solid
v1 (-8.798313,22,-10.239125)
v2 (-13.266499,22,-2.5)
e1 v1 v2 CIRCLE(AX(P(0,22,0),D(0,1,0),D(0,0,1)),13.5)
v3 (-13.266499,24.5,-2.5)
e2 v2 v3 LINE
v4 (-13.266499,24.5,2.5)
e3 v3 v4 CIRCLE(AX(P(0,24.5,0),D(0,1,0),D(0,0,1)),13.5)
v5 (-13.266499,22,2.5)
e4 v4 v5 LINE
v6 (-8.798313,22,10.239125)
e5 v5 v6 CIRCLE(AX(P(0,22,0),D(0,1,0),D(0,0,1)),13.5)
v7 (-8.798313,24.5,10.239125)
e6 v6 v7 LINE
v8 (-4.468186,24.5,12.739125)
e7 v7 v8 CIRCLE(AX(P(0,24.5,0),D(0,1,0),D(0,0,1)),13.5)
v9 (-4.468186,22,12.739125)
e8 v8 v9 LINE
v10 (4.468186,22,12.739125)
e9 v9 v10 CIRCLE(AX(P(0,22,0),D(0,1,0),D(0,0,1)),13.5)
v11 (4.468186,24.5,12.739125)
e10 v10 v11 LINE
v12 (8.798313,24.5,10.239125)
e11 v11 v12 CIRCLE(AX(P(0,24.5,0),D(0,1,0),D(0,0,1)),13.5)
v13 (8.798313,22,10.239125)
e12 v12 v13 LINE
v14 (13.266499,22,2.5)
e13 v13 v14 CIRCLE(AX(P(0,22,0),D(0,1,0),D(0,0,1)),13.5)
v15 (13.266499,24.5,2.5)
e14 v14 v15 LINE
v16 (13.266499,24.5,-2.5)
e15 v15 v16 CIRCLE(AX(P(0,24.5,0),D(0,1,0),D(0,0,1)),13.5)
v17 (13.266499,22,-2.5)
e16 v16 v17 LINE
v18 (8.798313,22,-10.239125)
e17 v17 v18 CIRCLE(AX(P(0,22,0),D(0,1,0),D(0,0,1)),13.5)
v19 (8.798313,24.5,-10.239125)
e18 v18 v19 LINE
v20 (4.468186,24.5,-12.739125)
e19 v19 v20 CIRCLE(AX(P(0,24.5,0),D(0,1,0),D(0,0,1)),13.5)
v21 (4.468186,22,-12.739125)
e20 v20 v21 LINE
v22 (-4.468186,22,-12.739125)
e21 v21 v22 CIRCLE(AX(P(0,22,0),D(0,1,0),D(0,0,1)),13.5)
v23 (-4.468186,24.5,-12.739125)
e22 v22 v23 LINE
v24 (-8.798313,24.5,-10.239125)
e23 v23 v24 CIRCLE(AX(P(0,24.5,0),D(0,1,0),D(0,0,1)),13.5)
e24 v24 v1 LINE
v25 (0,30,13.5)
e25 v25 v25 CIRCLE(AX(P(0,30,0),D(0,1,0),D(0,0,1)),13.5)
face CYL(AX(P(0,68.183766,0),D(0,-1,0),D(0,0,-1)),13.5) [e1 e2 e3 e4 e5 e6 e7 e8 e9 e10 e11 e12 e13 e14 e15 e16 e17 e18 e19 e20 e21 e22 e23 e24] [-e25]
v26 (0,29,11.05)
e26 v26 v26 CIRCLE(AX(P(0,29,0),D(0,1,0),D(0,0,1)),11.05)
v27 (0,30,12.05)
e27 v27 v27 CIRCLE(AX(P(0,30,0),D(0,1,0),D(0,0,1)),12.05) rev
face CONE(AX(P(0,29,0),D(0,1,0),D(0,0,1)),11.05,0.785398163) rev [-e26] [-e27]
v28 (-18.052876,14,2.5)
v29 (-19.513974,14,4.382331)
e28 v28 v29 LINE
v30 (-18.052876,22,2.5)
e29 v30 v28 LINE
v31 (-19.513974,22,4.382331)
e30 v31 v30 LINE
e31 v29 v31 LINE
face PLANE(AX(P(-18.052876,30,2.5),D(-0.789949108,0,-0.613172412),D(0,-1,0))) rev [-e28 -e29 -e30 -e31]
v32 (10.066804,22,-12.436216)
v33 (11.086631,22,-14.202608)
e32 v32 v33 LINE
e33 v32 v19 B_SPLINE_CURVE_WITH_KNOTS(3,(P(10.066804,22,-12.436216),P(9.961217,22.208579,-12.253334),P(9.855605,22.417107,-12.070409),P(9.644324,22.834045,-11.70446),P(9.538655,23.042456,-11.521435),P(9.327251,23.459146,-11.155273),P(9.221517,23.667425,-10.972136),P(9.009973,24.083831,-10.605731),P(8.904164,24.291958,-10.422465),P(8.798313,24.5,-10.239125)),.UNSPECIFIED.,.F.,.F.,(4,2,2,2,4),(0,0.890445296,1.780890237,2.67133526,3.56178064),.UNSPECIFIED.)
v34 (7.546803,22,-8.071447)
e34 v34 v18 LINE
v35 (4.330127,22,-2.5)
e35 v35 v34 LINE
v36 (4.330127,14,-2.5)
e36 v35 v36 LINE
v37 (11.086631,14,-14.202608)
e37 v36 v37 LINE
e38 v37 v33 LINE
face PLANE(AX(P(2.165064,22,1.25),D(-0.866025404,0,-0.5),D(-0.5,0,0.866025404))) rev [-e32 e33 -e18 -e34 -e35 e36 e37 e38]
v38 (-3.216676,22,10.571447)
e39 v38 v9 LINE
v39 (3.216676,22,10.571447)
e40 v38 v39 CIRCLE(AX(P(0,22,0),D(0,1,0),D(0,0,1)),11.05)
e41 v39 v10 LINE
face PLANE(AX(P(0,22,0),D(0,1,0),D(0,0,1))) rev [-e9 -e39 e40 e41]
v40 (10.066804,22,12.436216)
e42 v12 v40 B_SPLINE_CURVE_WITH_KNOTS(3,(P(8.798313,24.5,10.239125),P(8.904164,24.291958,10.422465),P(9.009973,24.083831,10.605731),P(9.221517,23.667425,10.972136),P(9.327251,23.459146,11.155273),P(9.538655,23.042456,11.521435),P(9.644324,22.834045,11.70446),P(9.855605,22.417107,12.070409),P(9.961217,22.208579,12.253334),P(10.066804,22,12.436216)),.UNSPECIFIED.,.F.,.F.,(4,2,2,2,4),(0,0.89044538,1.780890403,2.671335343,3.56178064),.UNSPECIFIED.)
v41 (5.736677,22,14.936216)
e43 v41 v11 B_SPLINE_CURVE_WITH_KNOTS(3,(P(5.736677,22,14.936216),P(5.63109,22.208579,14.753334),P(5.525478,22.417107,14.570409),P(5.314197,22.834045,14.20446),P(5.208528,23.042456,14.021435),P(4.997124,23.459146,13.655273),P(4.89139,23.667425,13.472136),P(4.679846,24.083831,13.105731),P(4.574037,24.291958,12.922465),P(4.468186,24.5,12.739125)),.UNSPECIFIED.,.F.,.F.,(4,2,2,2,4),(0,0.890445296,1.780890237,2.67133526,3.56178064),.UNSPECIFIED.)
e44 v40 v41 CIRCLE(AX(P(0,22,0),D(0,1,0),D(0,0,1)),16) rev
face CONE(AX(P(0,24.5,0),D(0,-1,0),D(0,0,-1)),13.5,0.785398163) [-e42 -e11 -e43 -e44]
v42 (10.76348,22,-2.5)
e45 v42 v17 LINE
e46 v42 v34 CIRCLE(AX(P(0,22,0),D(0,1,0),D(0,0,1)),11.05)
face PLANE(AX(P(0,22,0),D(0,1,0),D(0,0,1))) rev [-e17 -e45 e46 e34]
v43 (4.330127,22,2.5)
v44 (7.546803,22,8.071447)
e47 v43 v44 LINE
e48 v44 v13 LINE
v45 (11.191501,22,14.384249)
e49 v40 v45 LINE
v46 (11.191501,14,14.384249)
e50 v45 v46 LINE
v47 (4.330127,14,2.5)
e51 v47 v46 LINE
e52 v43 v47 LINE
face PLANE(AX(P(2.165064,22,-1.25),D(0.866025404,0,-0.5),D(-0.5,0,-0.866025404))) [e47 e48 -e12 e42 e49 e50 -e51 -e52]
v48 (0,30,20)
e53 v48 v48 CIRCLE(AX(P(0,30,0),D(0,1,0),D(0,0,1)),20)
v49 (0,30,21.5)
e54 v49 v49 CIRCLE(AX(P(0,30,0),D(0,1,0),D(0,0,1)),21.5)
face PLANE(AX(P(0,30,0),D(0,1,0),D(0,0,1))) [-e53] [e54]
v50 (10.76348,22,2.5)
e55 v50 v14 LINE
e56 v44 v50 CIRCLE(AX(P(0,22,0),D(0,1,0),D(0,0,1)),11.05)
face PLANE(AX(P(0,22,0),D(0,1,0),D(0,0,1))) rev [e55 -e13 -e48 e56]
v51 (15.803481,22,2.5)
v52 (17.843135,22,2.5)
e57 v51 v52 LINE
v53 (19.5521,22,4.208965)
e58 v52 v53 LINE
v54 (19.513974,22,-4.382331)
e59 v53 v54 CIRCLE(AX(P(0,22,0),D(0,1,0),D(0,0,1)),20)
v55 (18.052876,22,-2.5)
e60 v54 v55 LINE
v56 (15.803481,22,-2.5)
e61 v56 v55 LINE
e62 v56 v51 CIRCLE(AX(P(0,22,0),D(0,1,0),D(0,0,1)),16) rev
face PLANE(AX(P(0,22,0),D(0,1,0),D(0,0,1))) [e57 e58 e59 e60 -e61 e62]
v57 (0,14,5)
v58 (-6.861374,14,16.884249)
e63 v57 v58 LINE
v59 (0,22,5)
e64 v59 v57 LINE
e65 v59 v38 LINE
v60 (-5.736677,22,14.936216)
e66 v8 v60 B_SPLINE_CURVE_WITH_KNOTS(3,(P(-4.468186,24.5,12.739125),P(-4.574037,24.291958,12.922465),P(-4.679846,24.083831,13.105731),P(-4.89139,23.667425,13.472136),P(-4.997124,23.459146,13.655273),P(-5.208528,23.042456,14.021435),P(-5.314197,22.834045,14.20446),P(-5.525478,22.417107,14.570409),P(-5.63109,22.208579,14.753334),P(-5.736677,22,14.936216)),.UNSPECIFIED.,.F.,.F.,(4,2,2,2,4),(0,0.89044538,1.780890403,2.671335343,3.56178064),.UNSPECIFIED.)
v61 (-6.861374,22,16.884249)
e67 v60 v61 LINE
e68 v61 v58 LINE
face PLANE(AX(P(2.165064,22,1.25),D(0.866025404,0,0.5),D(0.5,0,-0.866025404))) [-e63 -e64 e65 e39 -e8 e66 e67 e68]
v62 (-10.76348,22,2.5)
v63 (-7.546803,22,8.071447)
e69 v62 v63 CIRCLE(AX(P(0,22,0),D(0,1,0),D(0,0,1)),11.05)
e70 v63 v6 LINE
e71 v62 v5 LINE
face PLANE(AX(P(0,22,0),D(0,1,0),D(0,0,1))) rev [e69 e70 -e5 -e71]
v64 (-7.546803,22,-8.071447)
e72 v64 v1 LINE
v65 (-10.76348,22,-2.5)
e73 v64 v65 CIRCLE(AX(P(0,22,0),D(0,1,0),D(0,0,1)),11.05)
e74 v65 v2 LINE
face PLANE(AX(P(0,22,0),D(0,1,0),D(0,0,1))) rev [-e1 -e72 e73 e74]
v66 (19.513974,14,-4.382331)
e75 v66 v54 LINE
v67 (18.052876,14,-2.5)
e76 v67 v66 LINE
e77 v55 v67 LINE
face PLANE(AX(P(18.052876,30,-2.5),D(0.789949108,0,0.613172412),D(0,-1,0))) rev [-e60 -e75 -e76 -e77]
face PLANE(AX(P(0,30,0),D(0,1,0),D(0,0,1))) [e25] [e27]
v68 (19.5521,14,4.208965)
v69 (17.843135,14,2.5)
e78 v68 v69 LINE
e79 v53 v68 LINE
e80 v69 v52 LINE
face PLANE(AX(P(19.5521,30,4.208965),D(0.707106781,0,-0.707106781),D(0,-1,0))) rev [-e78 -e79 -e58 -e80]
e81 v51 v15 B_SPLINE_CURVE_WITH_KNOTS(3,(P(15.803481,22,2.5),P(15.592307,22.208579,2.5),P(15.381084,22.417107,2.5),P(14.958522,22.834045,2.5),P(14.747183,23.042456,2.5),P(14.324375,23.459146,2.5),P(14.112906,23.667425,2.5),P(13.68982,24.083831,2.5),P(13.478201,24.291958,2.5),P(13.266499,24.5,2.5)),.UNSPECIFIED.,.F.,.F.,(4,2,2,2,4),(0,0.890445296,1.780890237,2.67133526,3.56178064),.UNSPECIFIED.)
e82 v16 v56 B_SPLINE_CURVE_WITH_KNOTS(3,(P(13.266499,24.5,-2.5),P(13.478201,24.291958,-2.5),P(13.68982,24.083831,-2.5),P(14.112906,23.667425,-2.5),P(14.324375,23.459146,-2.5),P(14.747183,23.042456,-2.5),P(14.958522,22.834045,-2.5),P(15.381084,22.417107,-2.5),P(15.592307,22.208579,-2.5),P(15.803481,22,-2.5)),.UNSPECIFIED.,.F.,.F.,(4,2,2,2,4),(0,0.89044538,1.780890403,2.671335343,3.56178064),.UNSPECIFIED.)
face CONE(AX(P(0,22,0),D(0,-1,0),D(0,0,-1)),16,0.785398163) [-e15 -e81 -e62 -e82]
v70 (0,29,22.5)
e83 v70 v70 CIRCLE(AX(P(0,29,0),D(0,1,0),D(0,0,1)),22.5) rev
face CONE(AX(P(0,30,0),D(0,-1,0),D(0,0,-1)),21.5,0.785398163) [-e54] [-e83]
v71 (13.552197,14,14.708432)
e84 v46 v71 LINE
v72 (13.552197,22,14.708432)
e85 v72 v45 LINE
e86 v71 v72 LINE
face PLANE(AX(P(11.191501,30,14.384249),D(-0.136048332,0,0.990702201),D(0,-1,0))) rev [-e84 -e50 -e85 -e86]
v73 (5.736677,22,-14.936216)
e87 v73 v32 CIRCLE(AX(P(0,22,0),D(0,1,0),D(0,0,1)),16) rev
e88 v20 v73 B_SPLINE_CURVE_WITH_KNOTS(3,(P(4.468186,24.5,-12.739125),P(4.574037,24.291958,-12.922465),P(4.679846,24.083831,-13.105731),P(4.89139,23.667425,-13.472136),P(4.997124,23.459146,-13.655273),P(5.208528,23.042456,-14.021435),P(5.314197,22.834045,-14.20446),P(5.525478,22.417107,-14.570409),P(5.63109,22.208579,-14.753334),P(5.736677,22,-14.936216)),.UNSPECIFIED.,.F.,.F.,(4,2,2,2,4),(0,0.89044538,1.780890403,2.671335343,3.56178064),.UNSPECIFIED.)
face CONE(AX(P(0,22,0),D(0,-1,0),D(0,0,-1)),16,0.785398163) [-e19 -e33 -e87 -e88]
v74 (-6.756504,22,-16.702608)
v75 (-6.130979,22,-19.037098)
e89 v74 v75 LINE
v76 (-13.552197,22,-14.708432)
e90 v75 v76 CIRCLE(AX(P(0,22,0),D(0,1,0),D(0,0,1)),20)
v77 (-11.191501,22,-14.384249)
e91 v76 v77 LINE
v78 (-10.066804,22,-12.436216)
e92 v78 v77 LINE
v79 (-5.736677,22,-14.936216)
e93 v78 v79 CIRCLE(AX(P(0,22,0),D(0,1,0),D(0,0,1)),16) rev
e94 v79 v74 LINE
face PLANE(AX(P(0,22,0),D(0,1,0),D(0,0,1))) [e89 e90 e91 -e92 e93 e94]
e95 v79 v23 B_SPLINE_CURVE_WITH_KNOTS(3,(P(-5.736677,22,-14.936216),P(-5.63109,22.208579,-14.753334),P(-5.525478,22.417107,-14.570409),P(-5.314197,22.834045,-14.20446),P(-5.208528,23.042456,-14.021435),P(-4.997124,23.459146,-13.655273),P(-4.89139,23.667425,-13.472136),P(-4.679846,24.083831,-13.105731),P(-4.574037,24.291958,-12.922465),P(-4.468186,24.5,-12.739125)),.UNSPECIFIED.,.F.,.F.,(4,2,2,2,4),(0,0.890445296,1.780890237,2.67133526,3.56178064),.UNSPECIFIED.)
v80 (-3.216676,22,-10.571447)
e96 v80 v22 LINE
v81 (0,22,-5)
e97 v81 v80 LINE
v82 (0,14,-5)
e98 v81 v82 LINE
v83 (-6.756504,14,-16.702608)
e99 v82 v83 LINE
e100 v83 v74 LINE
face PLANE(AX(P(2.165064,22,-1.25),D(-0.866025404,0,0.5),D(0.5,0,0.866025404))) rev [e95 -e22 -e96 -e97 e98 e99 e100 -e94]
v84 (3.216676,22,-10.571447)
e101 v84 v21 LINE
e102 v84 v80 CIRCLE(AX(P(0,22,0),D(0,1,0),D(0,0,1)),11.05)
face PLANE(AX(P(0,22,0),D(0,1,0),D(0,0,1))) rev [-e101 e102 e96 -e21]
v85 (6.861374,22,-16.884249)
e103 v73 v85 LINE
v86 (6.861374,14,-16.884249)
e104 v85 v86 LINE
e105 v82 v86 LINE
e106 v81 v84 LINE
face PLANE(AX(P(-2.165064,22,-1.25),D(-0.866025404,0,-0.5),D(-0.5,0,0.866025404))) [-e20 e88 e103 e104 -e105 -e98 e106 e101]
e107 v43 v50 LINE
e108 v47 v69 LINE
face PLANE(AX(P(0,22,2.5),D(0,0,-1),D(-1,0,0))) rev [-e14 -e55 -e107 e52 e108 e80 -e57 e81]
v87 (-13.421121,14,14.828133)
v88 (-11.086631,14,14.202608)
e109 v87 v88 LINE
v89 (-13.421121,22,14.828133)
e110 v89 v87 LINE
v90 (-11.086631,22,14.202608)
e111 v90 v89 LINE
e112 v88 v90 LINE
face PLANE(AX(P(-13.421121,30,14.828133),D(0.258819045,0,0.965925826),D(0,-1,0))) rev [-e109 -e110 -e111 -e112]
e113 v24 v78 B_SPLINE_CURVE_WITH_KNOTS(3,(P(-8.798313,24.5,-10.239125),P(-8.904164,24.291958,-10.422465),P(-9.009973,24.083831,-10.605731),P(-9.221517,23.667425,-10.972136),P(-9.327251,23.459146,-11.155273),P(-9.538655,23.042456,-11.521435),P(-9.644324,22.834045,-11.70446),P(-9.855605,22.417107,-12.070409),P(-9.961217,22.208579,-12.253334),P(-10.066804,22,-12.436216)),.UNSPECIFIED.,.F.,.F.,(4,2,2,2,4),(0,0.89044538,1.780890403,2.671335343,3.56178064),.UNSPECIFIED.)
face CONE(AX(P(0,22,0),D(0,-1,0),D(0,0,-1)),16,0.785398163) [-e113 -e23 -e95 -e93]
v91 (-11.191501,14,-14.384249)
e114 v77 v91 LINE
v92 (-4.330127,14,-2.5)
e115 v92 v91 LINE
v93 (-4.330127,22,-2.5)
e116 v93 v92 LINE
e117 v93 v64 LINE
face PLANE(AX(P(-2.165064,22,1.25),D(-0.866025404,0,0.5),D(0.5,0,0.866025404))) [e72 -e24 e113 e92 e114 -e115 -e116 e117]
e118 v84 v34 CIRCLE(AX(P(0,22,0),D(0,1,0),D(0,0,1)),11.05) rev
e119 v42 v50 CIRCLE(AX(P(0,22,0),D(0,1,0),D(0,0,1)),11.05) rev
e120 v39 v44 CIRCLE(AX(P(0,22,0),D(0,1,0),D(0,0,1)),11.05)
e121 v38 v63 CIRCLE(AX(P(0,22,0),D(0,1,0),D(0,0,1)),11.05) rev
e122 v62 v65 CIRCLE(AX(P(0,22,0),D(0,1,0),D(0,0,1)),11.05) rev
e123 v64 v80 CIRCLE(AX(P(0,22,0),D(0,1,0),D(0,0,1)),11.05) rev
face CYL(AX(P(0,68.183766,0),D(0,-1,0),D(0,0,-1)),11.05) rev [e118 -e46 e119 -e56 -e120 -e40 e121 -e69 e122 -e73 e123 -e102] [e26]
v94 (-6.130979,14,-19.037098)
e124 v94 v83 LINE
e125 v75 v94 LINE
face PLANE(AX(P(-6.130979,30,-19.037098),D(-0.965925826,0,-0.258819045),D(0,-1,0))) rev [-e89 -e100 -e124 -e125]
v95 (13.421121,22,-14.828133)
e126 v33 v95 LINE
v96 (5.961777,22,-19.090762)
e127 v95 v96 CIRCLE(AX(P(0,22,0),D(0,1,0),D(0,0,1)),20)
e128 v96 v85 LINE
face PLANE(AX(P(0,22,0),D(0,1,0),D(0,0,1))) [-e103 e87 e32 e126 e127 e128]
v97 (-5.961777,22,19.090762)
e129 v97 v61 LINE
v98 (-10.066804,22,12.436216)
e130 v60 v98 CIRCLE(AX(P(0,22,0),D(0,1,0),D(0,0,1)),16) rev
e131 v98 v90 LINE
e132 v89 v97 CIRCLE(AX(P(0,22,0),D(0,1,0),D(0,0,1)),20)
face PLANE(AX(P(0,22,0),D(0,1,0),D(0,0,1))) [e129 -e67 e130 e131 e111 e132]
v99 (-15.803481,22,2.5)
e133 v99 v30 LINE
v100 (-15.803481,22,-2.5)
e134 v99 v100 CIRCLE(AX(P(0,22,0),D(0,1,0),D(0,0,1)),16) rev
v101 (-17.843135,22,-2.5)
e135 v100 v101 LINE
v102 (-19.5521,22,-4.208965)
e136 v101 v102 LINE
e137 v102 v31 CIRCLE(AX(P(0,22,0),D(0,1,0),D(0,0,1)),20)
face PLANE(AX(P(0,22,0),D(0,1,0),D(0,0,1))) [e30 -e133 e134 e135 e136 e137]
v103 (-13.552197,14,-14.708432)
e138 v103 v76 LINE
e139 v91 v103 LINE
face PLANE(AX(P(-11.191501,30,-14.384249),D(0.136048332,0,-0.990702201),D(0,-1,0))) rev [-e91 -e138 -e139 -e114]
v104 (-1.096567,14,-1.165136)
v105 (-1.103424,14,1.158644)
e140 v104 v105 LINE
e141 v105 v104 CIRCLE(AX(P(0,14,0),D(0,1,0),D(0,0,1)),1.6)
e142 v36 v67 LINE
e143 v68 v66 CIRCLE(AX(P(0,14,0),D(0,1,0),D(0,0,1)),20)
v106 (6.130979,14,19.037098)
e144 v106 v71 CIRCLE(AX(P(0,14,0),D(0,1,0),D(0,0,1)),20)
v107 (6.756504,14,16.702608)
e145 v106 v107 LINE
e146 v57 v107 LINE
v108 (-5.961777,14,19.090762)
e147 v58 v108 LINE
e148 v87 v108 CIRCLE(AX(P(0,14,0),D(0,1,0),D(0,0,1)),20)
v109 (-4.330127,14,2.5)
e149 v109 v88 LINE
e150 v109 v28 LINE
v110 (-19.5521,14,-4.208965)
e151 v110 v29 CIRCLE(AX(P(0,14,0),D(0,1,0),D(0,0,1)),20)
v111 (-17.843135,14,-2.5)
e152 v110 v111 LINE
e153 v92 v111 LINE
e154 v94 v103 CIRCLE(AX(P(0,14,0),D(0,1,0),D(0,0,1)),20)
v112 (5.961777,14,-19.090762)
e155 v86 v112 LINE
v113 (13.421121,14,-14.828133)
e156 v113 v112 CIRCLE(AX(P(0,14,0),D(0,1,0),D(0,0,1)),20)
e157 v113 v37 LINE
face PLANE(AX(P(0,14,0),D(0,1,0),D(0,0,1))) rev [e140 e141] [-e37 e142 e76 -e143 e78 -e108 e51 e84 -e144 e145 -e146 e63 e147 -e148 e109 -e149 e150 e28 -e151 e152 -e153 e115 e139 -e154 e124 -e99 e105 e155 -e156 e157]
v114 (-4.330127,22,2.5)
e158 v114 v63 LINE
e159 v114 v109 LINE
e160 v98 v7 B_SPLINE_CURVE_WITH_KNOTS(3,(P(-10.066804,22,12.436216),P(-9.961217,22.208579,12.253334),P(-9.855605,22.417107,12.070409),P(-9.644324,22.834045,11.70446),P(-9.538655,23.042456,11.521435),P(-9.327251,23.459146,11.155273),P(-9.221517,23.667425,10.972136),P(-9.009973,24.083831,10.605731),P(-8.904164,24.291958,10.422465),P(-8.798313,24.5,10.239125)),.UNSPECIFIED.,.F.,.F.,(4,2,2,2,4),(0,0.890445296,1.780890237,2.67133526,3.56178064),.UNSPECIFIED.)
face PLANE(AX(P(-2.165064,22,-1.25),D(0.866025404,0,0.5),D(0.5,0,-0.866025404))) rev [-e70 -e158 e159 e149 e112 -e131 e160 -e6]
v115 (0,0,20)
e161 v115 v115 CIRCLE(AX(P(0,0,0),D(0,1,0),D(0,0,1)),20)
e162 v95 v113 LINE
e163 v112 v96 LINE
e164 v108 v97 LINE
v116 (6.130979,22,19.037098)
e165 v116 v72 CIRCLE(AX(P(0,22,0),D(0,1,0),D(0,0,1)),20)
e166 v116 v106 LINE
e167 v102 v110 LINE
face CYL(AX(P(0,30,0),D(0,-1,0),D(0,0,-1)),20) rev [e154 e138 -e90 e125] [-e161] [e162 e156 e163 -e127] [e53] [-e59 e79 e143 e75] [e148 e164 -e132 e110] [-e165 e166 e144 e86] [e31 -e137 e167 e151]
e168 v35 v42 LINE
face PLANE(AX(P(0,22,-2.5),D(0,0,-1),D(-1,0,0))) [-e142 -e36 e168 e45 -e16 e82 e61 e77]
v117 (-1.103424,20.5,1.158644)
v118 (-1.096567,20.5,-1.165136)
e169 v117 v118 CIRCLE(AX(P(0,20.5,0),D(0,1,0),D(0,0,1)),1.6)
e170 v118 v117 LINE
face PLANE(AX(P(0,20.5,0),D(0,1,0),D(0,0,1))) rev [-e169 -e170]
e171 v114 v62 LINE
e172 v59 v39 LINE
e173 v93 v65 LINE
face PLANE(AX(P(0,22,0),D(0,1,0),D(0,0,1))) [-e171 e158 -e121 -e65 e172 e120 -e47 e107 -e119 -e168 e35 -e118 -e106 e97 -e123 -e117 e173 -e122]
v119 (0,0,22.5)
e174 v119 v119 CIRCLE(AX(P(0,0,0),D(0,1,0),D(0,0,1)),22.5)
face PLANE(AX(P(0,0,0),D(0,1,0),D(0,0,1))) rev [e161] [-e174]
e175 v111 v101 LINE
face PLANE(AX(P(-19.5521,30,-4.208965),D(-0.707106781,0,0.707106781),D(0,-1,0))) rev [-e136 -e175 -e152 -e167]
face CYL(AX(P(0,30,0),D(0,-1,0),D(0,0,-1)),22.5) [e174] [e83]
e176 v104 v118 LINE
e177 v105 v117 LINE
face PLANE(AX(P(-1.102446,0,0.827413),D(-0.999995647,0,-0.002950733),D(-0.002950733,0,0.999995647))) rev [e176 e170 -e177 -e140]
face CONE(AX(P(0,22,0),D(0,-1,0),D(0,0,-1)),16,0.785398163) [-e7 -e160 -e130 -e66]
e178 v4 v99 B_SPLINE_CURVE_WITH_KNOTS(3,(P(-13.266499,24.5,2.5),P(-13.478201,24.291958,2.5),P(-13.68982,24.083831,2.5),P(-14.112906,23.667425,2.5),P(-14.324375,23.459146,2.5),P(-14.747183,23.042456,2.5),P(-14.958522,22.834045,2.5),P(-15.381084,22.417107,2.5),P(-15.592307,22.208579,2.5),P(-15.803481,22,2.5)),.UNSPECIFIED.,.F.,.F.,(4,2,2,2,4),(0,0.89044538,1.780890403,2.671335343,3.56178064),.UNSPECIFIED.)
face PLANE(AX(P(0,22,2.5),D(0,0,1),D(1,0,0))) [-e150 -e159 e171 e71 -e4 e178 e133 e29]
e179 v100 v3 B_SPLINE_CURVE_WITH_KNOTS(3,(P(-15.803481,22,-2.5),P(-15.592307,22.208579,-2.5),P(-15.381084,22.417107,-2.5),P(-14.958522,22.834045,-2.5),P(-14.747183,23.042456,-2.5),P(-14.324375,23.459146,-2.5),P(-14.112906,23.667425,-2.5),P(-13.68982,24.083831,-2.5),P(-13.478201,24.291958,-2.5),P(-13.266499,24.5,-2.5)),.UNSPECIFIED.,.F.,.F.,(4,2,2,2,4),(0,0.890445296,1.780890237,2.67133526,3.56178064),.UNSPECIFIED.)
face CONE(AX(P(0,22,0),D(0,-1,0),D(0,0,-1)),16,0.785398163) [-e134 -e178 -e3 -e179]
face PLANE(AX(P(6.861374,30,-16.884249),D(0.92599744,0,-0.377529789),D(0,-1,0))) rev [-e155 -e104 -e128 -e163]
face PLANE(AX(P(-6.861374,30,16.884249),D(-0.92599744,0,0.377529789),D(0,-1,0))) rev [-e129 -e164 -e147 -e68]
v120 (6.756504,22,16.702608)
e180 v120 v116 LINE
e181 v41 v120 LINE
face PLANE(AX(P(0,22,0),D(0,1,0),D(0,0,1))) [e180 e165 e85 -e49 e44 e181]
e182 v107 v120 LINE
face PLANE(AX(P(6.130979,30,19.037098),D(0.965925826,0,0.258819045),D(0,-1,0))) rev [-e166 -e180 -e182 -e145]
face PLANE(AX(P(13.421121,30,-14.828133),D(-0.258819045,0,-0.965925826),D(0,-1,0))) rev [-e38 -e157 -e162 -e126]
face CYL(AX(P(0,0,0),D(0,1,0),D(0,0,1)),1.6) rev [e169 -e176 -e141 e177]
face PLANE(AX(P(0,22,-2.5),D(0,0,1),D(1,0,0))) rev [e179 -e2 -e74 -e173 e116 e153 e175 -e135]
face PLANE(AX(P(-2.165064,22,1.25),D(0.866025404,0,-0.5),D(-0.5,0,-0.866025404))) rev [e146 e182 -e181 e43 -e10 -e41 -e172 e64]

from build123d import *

# Parameters (mm, degrees)
SKETCH1_R               = 22.5
SKETCH1_R_2             = 20
BOSS_EXTRUDE1_DEPTH     = 30
BOSS_EXTRUDE2_DEPTH     = 4
CHAMFER1_SIZE           = 2
CHAMFER1_SIZE_2         = 1.79025908
CUT_EXTRUDE1_DEPTH      = 39.684622268
CUT_EXTRUDE1_DEPTH_BACK = 39.684622268
BOSS_EXTRUDE3_START     = -1.5
BOSS_EXTRUDE3_DEPTH     = 1.5
SKETCH6_R               = 13.5
SKETCH6_R_2             = 11.05
BOSS_EXTRUDE4_DEPTH     = 8
CHAMFER2_SIZE           = 1
CHAMFER3_SIZE           = 1
CHAMFER4_SIZE           = 2.5


with BuildPart() as part:
    # Sketch1 → Boss-Extrude1 (new body)
    with BuildSketch(Plane(origin=(0, 0, 0), x_dir=(1, 0, 0), z_dir=(0, 1, 0))):
        with Locations(Location((0, 0, 0), (0, 0, 270))):
            Circle(SKETCH1_R)
        with Locations(Location((0, 0, 0), (0, 0, 270))):
            Circle(SKETCH1_R_2, mode=Mode.SUBTRACT)
    extrude(amount=BOSS_EXTRUDE1_DEPTH)

    # Sketch2 → Boss-Extrude2 (add, symmetric)
    with BuildSketch(Plane(origin=(0, 18, 0), x_dir=(1, 0, 0), z_dir=(0, 1, 0))):
        with BuildLine():
            Line((-12.086630926, 15.934658856), (-4.330127019, 2.5))
            Line((-4.330127019, 2.5), (-19.843134833, 2.5))
            ThreePointArc((-19.843134833, 2.5), (-20, 0), (-19.843134833, -2.5))
            Line((-19.843134833, -2.5), (-4.330127019, -2.5))
            Line((-4.330127019, -2.5), (-12.086630926, -15.934658856))
            ThreePointArc((-12.086630926, -15.934658856), (-10, -17.320508076), (-7.756503907, -18.434658856))
            Line((-7.756503907, -18.434658856), (0, -5))
            Line((0, -5), (7.756503907, -18.434658856))
            ThreePointArc((7.756503907, -18.434658856), (10, -17.320508076), (12.086630926, -15.934658856))
            Line((12.086630926, -15.934658856), (4.330127019, -2.5))
            Line((4.330127019, -2.5), (19.843134833, -2.5))
            ThreePointArc((19.843134833, -2.5), (19.960745185, -1.252458251), (20, 0))
            ThreePointArc((20, 0), (19.960745185, 1.252458251), (19.843134833, 2.5))
            Line((19.843134833, 2.5), (4.330127019, 2.5))
            Line((4.330127019, 2.5), (12.086630926, 15.934658856))
            ThreePointArc((12.086630926, 15.934658856), (10, 17.320508076), (7.756503907, 18.434658856))
            Line((7.756503907, 18.434658856), (0, 5))
            Line((0, 5), (-7.756503907, 18.434658856))
            ThreePointArc((-7.756503907, 18.434658856), (-10, 17.320508076), (-12.086630926, 15.934658856))
        make_face()
    extrude(amount=BOSS_EXTRUDE2_DEPTH, both=True)

    # Chamfer1
    # the kernel refuses this chamfer: 2, 1.79025908 mm, written as the material it adds along each edge
    with BuildSketch(Plane(origin=(7.756503907, 22, 18.434658856), x_dir=(-0.9376749432180777, 0, 0.34751359809505994), z_dir=(0, -1, 0)), Plane(origin=(19.843134833, 22, 2.5), x_dir=(-0.16788186749818226, 0, 0.9858071203665161), z_dir=(0, -1, 0)), Plane(origin=(12.086630926, 22, -15.934658856), x_dir=(0.7697930757198956, 0, 0.6382935222714571), z_dir=(0, -1, 0)), Plane(origin=(-7.756503907, 22, -18.434658856), x_dir=(0.9376749432180783, 0, -0.34751359809505833), z_dir=(0, -1, 0)), Plane(origin=(-19.843134833, 22, -2.5), x_dir=(0.1678818674981782, 0, -0.9858071203665167), z_dir=(0, -1, 0)), Plane(origin=(-12.086630926, 22, 15.934658856), x_dir=(-0.7697930757198955, 0, -0.6382935222714572), z_dir=(0, -1, 0))) as chamfer1_piece_1:
        with BuildLine():
            Line((1.733569464, 0), (CHAMFER1_SIZE * 0.167881867498, CHAMFER1_SIZE * 0.985807120367))
            Line((CHAMFER1_SIZE * 0.167881867498, CHAMFER1_SIZE * 0.985807120367), (0, 0))
            ThreePointArc((0, 0), (0.889903139, -0.018778361), (1.733569464, 0))
        make_face()
    extrude(amount=8)
    with BuildSketch(Plane(origin=(12.086630926, 14, 15.934658856), x_dir=(0.7669529363679002, 0, -0.6417033531131466), z_dir=(0, 1, 0)), Plane(origin=(19.843134833, 14, -2.5), x_dir=(-0.17225493730569186, 0, -0.9850524029582447), z_dir=(0, 1, 0)), Plane(origin=(7.756503907, 14, -18.434658856), x_dir=(-0.9392078736735914, 0, -0.3433490498450975), z_dir=(0, 1, 0)), Plane(origin=(-12.086630926, 14, -15.934658856), x_dir=(-0.766952936367899, 0, 0.641703353113148), z_dir=(0, 1, 0)), Plane(origin=(-19.843134833, 14, 2.5), x_dir=(0.17225493730568892, 0, 0.9850524029582453), z_dir=(0, 1, 0)), Plane(origin=(-7.756503907, 14, 18.434658856), x_dir=(0.9392078736735913, 0, 0.3433490498450977), z_dir=(0, 1, 0))) as chamfer1_piece_2:
        with BuildLine():
            Line((1.910893878, 0), (CHAMFER1_SIZE_2 * 0.172254937261, CHAMFER1_SIZE_2 * 0.985052402702))
            Line((CHAMFER1_SIZE_2 * 0.172254937261, CHAMFER1_SIZE_2 * 0.985052402702), (0, 0))
            ThreePointArc((0, 0), (0.982338586, -0.022816928), (1.910893878, 0))
        make_face()
    extrude(amount=8)

    # Sketch4 → Cut-Extrude1 (cut, two sides: drawn at the far end of the back side and taken through both)
    with BuildSketch(Plane(origin=(0, 22, 0), x_dir=(1, 0, 0), z_dir=(0, 1, 0)).offset(-CUT_EXTRUDE1_DEPTH_BACK)):
        with BuildLine():
            Line((-1.09656677, 1.165135752), (-1.097544149, 0.833904576))
            Line((-1.097544149, 0.833904576), (-1.102446274, -0.827412964))
            Line((-1.102446274, -0.827412964), (-1.103423653, -1.15864414))
            ThreePointArc((-1.103423653, -1.15864414), (1.599993035, -0.004721172), (-1.09656677, 1.165135752))
        make_face()
    extrude(amount=CUT_EXTRUDE1_DEPTH + CUT_EXTRUDE1_DEPTH_BACK, mode=Mode.SUBTRACT)

    # Sketch5 → Boss-Extrude3 (add)
    with BuildSketch(Plane(origin=(0, 22, 0), x_dir=(1, 0, 0), z_dir=(0, 1, 0)).offset(BOSS_EXTRUDE3_START)):
        with BuildLine():
            Line((-1.09656677, 1.165135752), (-1.103423653, -1.15864414))
            ThreePointArc((-1.103423653, -1.15864414), (1.599993035, -0.004721172), (-1.09656677, 1.165135752))
        make_face()
    extrude(amount=BOSS_EXTRUDE3_DEPTH)

    # Sketch6 → Boss-Extrude4 (add)
    with BuildSketch(Plane(origin=(0, 22, 0), x_dir=(1, 0, 0), z_dir=(0, 1, 0))):
        with Locations(Location((0, 0, 0), (0, 0, 109.328070714))):
            Circle(SKETCH6_R)
        with Locations(Location((0, 0, 0), (0, 0, 73.076060846))):
            Circle(SKETCH6_R_2, mode=Mode.SUBTRACT)
    extrude(amount=BOSS_EXTRUDE4_DEPTH)

    # Chamfer2
    chamfer2_edges = [part.edges().sort_by_distance(p)[0] for p in [
        (0, 30, -22.5),
    ]]
    chamfer(chamfer2_edges, length=CHAMFER2_SIZE)

    # Chamfer3
    chamfer3_edges = [part.edges().sort_by_distance(p)[0] for p in [
        (-3.216676451, 30, 10.571447044),
    ]]
    chamfer(chamfer3_edges, length=CHAMFER3_SIZE)

    # Chamfer4
    # the kernel refuses this chamfer: 2.5 mm, written as the material it adds along each edge
    with BuildSketch(Plane(origin=(0, 22, 0), x_dir=(0.7884516512749685, 0, 0.6150967351577924), z_dir=(-0.6150967351577924, 0, 0.7884516512749685))) as chamfer4_piece_1_section:
        Polygon((13.5, CHAMFER4_SIZE), (13.5 + CHAMFER4_SIZE, 0), (13.5, 0), align=None)
    chamfer4_piece_1 = revolve(axis=Axis((0, 22, 0), (0, 1, 0)), revolution_arc=75.917899148, mode=Mode.PRIVATE)
    chamfer4_piece_1 = split(chamfer4_piece_1, bisect_by=Plane(origin=(0, 22, 2.5), z_dir=(0, 0, -1)), keep=Keep.TOP, mode=Mode.PRIVATE)
    chamfer4_piece_1 = split(chamfer4_piece_1, bisect_by=Plane(origin=(0, 22, -2.5), z_dir=(0, 0, 1)), keep=Keep.TOP, mode=Mode.PRIVATE)
    add(chamfer4_piece_1)
    with BuildSketch(Plane(origin=(0, 22, 0), x_dir=(0.9269152240690147, 0, -0.3752707920809829), z_dir=(0.3752707920809829, 0, 0.9269152240690147))) as chamfer4_piece_2_section:
        Polygon((13.5, CHAMFER4_SIZE), (13.5 + CHAMFER4_SIZE, 0), (13.5, 0), align=None)
    chamfer4_piece_2 = revolve(axis=Axis((0, 22, 0), (0, 1, 0)), revolution_arc=75.917899148, mode=Mode.PRIVATE)
    chamfer4_piece_2 = split(chamfer4_piece_2, bisect_by=Plane(origin=(2.165063509, 22, 1.25), z_dir=(-0.8660254037844385, 0, -0.5000000000000003)), keep=Keep.TOP, mode=Mode.PRIVATE)
    chamfer4_piece_2 = split(chamfer4_piece_2, bisect_by=Plane(origin=(-2.165063509, 22, -1.25), z_dir=(0.8660254037844383, 0, 0.5000000000000009)), keep=Keep.TOP, mode=Mode.PRIVATE)
    add(chamfer4_piece_2)
    with BuildSketch(Plane(origin=(0, 22, 0), x_dir=(0.138463572798161, 0, -0.9903675272382311), z_dir=(0.9903675272382311, 0, 0.138463572798161))) as chamfer4_piece_3_section:
        Polygon((13.5, CHAMFER4_SIZE), (13.5 + CHAMFER4_SIZE, 0), (13.5, 0), align=None)
    chamfer4_piece_3 = revolve(axis=Axis((0, 22, 0), (0, 1, 0)), revolution_arc=75.917899148, mode=Mode.PRIVATE)
    chamfer4_piece_3 = split(chamfer4_piece_3, bisect_by=Plane(origin=(-2.165063509, 22, 1.25), z_dir=(0.8660254037844393, 0, -0.49999999999999906)), keep=Keep.TOP, mode=Mode.PRIVATE)
    chamfer4_piece_3 = split(chamfer4_piece_3, bisect_by=Plane(origin=(2.165063509, 22, -1.25), z_dir=(-0.8660254037844392, 0, 0.49999999999999917)), keep=Keep.TOP, mode=Mode.PRIVATE)
    add(chamfer4_piece_3)
    with BuildSketch(Plane(origin=(0, 22, 0), x_dir=(-0.788451651274934, 0, -0.6150967351578366), z_dir=(0.6150967351578366, 0, -0.788451651274934))) as chamfer4_piece_4_section:
        Polygon((13.5, CHAMFER4_SIZE), (13.5 + CHAMFER4_SIZE, 0), (13.5, 0), align=None)
    chamfer4_piece_4 = revolve(axis=Axis((0, 22, 0), (0, 1, 0)), revolution_arc=75.917899148, mode=Mode.PRIVATE)
    chamfer4_piece_4 = split(chamfer4_piece_4, bisect_by=Plane(origin=(0, 22, -2.5), z_dir=(0, 0, 1)), keep=Keep.TOP, mode=Mode.PRIVATE)
    chamfer4_piece_4 = split(chamfer4_piece_4, bisect_by=Plane(origin=(0, 22, 2.5), z_dir=(0, 0, -1)), keep=Keep.TOP, mode=Mode.PRIVATE)
    add(chamfer4_piece_4)
    with BuildSketch(Plane(origin=(0, 22, 0), x_dir=(-0.9269152240690146, 0, 0.375270792080983), z_dir=(-0.375270792080983, 0, -0.9269152240690146))) as chamfer4_piece_5_section:
        Polygon((13.5, CHAMFER4_SIZE), (13.5 + CHAMFER4_SIZE, 0), (13.5, 0), align=None)
    chamfer4_piece_5 = revolve(axis=Axis((0, 22, 0), (0, 1, 0)), revolution_arc=75.917899148, mode=Mode.PRIVATE)
    chamfer4_piece_5 = split(chamfer4_piece_5, bisect_by=Plane(origin=(-2.165063509, 22, -1.25), z_dir=(0.8660254037844384, 0, 0.5000000000000006)), keep=Keep.TOP, mode=Mode.PRIVATE)
    chamfer4_piece_5 = split(chamfer4_piece_5, bisect_by=Plane(origin=(2.165063509, 22, 1.25), z_dir=(-0.8660254037844386, 0, -0.5000000000000003)), keep=Keep.TOP, mode=Mode.PRIVATE)
    add(chamfer4_piece_5)
    with BuildSketch(Plane(origin=(0, 22, 0), x_dir=(-0.13846357279405325, 0, 0.9903675272388054), z_dir=(-0.9903675272388054, 0, -0.13846357279405325))) as chamfer4_piece_6_section:
        Polygon((13.5, CHAMFER4_SIZE), (13.5 + CHAMFER4_SIZE, 0), (13.5, 0), align=None)
    chamfer4_piece_6 = revolve(axis=Axis((0, 22, 0), (0, 1, 0)), revolution_arc=75.917899148, mode=Mode.PRIVATE)
    chamfer4_piece_6 = split(chamfer4_piece_6, bisect_by=Plane(origin=(-2.165063509, 22, 1.25), z_dir=(0.8660254037844392, 0, -0.4999999999999992)), keep=Keep.TOP, mode=Mode.PRIVATE)
    chamfer4_piece_6 = split(chamfer4_piece_6, bisect_by=Plane(origin=(2.165063509, 22, -1.25), z_dir=(-0.866025403784439, 0, 0.4999999999999993)), keep=Keep.TOP, mode=Mode.PRIVATE)
    add(chamfer4_piece_6)


solid = part.part
